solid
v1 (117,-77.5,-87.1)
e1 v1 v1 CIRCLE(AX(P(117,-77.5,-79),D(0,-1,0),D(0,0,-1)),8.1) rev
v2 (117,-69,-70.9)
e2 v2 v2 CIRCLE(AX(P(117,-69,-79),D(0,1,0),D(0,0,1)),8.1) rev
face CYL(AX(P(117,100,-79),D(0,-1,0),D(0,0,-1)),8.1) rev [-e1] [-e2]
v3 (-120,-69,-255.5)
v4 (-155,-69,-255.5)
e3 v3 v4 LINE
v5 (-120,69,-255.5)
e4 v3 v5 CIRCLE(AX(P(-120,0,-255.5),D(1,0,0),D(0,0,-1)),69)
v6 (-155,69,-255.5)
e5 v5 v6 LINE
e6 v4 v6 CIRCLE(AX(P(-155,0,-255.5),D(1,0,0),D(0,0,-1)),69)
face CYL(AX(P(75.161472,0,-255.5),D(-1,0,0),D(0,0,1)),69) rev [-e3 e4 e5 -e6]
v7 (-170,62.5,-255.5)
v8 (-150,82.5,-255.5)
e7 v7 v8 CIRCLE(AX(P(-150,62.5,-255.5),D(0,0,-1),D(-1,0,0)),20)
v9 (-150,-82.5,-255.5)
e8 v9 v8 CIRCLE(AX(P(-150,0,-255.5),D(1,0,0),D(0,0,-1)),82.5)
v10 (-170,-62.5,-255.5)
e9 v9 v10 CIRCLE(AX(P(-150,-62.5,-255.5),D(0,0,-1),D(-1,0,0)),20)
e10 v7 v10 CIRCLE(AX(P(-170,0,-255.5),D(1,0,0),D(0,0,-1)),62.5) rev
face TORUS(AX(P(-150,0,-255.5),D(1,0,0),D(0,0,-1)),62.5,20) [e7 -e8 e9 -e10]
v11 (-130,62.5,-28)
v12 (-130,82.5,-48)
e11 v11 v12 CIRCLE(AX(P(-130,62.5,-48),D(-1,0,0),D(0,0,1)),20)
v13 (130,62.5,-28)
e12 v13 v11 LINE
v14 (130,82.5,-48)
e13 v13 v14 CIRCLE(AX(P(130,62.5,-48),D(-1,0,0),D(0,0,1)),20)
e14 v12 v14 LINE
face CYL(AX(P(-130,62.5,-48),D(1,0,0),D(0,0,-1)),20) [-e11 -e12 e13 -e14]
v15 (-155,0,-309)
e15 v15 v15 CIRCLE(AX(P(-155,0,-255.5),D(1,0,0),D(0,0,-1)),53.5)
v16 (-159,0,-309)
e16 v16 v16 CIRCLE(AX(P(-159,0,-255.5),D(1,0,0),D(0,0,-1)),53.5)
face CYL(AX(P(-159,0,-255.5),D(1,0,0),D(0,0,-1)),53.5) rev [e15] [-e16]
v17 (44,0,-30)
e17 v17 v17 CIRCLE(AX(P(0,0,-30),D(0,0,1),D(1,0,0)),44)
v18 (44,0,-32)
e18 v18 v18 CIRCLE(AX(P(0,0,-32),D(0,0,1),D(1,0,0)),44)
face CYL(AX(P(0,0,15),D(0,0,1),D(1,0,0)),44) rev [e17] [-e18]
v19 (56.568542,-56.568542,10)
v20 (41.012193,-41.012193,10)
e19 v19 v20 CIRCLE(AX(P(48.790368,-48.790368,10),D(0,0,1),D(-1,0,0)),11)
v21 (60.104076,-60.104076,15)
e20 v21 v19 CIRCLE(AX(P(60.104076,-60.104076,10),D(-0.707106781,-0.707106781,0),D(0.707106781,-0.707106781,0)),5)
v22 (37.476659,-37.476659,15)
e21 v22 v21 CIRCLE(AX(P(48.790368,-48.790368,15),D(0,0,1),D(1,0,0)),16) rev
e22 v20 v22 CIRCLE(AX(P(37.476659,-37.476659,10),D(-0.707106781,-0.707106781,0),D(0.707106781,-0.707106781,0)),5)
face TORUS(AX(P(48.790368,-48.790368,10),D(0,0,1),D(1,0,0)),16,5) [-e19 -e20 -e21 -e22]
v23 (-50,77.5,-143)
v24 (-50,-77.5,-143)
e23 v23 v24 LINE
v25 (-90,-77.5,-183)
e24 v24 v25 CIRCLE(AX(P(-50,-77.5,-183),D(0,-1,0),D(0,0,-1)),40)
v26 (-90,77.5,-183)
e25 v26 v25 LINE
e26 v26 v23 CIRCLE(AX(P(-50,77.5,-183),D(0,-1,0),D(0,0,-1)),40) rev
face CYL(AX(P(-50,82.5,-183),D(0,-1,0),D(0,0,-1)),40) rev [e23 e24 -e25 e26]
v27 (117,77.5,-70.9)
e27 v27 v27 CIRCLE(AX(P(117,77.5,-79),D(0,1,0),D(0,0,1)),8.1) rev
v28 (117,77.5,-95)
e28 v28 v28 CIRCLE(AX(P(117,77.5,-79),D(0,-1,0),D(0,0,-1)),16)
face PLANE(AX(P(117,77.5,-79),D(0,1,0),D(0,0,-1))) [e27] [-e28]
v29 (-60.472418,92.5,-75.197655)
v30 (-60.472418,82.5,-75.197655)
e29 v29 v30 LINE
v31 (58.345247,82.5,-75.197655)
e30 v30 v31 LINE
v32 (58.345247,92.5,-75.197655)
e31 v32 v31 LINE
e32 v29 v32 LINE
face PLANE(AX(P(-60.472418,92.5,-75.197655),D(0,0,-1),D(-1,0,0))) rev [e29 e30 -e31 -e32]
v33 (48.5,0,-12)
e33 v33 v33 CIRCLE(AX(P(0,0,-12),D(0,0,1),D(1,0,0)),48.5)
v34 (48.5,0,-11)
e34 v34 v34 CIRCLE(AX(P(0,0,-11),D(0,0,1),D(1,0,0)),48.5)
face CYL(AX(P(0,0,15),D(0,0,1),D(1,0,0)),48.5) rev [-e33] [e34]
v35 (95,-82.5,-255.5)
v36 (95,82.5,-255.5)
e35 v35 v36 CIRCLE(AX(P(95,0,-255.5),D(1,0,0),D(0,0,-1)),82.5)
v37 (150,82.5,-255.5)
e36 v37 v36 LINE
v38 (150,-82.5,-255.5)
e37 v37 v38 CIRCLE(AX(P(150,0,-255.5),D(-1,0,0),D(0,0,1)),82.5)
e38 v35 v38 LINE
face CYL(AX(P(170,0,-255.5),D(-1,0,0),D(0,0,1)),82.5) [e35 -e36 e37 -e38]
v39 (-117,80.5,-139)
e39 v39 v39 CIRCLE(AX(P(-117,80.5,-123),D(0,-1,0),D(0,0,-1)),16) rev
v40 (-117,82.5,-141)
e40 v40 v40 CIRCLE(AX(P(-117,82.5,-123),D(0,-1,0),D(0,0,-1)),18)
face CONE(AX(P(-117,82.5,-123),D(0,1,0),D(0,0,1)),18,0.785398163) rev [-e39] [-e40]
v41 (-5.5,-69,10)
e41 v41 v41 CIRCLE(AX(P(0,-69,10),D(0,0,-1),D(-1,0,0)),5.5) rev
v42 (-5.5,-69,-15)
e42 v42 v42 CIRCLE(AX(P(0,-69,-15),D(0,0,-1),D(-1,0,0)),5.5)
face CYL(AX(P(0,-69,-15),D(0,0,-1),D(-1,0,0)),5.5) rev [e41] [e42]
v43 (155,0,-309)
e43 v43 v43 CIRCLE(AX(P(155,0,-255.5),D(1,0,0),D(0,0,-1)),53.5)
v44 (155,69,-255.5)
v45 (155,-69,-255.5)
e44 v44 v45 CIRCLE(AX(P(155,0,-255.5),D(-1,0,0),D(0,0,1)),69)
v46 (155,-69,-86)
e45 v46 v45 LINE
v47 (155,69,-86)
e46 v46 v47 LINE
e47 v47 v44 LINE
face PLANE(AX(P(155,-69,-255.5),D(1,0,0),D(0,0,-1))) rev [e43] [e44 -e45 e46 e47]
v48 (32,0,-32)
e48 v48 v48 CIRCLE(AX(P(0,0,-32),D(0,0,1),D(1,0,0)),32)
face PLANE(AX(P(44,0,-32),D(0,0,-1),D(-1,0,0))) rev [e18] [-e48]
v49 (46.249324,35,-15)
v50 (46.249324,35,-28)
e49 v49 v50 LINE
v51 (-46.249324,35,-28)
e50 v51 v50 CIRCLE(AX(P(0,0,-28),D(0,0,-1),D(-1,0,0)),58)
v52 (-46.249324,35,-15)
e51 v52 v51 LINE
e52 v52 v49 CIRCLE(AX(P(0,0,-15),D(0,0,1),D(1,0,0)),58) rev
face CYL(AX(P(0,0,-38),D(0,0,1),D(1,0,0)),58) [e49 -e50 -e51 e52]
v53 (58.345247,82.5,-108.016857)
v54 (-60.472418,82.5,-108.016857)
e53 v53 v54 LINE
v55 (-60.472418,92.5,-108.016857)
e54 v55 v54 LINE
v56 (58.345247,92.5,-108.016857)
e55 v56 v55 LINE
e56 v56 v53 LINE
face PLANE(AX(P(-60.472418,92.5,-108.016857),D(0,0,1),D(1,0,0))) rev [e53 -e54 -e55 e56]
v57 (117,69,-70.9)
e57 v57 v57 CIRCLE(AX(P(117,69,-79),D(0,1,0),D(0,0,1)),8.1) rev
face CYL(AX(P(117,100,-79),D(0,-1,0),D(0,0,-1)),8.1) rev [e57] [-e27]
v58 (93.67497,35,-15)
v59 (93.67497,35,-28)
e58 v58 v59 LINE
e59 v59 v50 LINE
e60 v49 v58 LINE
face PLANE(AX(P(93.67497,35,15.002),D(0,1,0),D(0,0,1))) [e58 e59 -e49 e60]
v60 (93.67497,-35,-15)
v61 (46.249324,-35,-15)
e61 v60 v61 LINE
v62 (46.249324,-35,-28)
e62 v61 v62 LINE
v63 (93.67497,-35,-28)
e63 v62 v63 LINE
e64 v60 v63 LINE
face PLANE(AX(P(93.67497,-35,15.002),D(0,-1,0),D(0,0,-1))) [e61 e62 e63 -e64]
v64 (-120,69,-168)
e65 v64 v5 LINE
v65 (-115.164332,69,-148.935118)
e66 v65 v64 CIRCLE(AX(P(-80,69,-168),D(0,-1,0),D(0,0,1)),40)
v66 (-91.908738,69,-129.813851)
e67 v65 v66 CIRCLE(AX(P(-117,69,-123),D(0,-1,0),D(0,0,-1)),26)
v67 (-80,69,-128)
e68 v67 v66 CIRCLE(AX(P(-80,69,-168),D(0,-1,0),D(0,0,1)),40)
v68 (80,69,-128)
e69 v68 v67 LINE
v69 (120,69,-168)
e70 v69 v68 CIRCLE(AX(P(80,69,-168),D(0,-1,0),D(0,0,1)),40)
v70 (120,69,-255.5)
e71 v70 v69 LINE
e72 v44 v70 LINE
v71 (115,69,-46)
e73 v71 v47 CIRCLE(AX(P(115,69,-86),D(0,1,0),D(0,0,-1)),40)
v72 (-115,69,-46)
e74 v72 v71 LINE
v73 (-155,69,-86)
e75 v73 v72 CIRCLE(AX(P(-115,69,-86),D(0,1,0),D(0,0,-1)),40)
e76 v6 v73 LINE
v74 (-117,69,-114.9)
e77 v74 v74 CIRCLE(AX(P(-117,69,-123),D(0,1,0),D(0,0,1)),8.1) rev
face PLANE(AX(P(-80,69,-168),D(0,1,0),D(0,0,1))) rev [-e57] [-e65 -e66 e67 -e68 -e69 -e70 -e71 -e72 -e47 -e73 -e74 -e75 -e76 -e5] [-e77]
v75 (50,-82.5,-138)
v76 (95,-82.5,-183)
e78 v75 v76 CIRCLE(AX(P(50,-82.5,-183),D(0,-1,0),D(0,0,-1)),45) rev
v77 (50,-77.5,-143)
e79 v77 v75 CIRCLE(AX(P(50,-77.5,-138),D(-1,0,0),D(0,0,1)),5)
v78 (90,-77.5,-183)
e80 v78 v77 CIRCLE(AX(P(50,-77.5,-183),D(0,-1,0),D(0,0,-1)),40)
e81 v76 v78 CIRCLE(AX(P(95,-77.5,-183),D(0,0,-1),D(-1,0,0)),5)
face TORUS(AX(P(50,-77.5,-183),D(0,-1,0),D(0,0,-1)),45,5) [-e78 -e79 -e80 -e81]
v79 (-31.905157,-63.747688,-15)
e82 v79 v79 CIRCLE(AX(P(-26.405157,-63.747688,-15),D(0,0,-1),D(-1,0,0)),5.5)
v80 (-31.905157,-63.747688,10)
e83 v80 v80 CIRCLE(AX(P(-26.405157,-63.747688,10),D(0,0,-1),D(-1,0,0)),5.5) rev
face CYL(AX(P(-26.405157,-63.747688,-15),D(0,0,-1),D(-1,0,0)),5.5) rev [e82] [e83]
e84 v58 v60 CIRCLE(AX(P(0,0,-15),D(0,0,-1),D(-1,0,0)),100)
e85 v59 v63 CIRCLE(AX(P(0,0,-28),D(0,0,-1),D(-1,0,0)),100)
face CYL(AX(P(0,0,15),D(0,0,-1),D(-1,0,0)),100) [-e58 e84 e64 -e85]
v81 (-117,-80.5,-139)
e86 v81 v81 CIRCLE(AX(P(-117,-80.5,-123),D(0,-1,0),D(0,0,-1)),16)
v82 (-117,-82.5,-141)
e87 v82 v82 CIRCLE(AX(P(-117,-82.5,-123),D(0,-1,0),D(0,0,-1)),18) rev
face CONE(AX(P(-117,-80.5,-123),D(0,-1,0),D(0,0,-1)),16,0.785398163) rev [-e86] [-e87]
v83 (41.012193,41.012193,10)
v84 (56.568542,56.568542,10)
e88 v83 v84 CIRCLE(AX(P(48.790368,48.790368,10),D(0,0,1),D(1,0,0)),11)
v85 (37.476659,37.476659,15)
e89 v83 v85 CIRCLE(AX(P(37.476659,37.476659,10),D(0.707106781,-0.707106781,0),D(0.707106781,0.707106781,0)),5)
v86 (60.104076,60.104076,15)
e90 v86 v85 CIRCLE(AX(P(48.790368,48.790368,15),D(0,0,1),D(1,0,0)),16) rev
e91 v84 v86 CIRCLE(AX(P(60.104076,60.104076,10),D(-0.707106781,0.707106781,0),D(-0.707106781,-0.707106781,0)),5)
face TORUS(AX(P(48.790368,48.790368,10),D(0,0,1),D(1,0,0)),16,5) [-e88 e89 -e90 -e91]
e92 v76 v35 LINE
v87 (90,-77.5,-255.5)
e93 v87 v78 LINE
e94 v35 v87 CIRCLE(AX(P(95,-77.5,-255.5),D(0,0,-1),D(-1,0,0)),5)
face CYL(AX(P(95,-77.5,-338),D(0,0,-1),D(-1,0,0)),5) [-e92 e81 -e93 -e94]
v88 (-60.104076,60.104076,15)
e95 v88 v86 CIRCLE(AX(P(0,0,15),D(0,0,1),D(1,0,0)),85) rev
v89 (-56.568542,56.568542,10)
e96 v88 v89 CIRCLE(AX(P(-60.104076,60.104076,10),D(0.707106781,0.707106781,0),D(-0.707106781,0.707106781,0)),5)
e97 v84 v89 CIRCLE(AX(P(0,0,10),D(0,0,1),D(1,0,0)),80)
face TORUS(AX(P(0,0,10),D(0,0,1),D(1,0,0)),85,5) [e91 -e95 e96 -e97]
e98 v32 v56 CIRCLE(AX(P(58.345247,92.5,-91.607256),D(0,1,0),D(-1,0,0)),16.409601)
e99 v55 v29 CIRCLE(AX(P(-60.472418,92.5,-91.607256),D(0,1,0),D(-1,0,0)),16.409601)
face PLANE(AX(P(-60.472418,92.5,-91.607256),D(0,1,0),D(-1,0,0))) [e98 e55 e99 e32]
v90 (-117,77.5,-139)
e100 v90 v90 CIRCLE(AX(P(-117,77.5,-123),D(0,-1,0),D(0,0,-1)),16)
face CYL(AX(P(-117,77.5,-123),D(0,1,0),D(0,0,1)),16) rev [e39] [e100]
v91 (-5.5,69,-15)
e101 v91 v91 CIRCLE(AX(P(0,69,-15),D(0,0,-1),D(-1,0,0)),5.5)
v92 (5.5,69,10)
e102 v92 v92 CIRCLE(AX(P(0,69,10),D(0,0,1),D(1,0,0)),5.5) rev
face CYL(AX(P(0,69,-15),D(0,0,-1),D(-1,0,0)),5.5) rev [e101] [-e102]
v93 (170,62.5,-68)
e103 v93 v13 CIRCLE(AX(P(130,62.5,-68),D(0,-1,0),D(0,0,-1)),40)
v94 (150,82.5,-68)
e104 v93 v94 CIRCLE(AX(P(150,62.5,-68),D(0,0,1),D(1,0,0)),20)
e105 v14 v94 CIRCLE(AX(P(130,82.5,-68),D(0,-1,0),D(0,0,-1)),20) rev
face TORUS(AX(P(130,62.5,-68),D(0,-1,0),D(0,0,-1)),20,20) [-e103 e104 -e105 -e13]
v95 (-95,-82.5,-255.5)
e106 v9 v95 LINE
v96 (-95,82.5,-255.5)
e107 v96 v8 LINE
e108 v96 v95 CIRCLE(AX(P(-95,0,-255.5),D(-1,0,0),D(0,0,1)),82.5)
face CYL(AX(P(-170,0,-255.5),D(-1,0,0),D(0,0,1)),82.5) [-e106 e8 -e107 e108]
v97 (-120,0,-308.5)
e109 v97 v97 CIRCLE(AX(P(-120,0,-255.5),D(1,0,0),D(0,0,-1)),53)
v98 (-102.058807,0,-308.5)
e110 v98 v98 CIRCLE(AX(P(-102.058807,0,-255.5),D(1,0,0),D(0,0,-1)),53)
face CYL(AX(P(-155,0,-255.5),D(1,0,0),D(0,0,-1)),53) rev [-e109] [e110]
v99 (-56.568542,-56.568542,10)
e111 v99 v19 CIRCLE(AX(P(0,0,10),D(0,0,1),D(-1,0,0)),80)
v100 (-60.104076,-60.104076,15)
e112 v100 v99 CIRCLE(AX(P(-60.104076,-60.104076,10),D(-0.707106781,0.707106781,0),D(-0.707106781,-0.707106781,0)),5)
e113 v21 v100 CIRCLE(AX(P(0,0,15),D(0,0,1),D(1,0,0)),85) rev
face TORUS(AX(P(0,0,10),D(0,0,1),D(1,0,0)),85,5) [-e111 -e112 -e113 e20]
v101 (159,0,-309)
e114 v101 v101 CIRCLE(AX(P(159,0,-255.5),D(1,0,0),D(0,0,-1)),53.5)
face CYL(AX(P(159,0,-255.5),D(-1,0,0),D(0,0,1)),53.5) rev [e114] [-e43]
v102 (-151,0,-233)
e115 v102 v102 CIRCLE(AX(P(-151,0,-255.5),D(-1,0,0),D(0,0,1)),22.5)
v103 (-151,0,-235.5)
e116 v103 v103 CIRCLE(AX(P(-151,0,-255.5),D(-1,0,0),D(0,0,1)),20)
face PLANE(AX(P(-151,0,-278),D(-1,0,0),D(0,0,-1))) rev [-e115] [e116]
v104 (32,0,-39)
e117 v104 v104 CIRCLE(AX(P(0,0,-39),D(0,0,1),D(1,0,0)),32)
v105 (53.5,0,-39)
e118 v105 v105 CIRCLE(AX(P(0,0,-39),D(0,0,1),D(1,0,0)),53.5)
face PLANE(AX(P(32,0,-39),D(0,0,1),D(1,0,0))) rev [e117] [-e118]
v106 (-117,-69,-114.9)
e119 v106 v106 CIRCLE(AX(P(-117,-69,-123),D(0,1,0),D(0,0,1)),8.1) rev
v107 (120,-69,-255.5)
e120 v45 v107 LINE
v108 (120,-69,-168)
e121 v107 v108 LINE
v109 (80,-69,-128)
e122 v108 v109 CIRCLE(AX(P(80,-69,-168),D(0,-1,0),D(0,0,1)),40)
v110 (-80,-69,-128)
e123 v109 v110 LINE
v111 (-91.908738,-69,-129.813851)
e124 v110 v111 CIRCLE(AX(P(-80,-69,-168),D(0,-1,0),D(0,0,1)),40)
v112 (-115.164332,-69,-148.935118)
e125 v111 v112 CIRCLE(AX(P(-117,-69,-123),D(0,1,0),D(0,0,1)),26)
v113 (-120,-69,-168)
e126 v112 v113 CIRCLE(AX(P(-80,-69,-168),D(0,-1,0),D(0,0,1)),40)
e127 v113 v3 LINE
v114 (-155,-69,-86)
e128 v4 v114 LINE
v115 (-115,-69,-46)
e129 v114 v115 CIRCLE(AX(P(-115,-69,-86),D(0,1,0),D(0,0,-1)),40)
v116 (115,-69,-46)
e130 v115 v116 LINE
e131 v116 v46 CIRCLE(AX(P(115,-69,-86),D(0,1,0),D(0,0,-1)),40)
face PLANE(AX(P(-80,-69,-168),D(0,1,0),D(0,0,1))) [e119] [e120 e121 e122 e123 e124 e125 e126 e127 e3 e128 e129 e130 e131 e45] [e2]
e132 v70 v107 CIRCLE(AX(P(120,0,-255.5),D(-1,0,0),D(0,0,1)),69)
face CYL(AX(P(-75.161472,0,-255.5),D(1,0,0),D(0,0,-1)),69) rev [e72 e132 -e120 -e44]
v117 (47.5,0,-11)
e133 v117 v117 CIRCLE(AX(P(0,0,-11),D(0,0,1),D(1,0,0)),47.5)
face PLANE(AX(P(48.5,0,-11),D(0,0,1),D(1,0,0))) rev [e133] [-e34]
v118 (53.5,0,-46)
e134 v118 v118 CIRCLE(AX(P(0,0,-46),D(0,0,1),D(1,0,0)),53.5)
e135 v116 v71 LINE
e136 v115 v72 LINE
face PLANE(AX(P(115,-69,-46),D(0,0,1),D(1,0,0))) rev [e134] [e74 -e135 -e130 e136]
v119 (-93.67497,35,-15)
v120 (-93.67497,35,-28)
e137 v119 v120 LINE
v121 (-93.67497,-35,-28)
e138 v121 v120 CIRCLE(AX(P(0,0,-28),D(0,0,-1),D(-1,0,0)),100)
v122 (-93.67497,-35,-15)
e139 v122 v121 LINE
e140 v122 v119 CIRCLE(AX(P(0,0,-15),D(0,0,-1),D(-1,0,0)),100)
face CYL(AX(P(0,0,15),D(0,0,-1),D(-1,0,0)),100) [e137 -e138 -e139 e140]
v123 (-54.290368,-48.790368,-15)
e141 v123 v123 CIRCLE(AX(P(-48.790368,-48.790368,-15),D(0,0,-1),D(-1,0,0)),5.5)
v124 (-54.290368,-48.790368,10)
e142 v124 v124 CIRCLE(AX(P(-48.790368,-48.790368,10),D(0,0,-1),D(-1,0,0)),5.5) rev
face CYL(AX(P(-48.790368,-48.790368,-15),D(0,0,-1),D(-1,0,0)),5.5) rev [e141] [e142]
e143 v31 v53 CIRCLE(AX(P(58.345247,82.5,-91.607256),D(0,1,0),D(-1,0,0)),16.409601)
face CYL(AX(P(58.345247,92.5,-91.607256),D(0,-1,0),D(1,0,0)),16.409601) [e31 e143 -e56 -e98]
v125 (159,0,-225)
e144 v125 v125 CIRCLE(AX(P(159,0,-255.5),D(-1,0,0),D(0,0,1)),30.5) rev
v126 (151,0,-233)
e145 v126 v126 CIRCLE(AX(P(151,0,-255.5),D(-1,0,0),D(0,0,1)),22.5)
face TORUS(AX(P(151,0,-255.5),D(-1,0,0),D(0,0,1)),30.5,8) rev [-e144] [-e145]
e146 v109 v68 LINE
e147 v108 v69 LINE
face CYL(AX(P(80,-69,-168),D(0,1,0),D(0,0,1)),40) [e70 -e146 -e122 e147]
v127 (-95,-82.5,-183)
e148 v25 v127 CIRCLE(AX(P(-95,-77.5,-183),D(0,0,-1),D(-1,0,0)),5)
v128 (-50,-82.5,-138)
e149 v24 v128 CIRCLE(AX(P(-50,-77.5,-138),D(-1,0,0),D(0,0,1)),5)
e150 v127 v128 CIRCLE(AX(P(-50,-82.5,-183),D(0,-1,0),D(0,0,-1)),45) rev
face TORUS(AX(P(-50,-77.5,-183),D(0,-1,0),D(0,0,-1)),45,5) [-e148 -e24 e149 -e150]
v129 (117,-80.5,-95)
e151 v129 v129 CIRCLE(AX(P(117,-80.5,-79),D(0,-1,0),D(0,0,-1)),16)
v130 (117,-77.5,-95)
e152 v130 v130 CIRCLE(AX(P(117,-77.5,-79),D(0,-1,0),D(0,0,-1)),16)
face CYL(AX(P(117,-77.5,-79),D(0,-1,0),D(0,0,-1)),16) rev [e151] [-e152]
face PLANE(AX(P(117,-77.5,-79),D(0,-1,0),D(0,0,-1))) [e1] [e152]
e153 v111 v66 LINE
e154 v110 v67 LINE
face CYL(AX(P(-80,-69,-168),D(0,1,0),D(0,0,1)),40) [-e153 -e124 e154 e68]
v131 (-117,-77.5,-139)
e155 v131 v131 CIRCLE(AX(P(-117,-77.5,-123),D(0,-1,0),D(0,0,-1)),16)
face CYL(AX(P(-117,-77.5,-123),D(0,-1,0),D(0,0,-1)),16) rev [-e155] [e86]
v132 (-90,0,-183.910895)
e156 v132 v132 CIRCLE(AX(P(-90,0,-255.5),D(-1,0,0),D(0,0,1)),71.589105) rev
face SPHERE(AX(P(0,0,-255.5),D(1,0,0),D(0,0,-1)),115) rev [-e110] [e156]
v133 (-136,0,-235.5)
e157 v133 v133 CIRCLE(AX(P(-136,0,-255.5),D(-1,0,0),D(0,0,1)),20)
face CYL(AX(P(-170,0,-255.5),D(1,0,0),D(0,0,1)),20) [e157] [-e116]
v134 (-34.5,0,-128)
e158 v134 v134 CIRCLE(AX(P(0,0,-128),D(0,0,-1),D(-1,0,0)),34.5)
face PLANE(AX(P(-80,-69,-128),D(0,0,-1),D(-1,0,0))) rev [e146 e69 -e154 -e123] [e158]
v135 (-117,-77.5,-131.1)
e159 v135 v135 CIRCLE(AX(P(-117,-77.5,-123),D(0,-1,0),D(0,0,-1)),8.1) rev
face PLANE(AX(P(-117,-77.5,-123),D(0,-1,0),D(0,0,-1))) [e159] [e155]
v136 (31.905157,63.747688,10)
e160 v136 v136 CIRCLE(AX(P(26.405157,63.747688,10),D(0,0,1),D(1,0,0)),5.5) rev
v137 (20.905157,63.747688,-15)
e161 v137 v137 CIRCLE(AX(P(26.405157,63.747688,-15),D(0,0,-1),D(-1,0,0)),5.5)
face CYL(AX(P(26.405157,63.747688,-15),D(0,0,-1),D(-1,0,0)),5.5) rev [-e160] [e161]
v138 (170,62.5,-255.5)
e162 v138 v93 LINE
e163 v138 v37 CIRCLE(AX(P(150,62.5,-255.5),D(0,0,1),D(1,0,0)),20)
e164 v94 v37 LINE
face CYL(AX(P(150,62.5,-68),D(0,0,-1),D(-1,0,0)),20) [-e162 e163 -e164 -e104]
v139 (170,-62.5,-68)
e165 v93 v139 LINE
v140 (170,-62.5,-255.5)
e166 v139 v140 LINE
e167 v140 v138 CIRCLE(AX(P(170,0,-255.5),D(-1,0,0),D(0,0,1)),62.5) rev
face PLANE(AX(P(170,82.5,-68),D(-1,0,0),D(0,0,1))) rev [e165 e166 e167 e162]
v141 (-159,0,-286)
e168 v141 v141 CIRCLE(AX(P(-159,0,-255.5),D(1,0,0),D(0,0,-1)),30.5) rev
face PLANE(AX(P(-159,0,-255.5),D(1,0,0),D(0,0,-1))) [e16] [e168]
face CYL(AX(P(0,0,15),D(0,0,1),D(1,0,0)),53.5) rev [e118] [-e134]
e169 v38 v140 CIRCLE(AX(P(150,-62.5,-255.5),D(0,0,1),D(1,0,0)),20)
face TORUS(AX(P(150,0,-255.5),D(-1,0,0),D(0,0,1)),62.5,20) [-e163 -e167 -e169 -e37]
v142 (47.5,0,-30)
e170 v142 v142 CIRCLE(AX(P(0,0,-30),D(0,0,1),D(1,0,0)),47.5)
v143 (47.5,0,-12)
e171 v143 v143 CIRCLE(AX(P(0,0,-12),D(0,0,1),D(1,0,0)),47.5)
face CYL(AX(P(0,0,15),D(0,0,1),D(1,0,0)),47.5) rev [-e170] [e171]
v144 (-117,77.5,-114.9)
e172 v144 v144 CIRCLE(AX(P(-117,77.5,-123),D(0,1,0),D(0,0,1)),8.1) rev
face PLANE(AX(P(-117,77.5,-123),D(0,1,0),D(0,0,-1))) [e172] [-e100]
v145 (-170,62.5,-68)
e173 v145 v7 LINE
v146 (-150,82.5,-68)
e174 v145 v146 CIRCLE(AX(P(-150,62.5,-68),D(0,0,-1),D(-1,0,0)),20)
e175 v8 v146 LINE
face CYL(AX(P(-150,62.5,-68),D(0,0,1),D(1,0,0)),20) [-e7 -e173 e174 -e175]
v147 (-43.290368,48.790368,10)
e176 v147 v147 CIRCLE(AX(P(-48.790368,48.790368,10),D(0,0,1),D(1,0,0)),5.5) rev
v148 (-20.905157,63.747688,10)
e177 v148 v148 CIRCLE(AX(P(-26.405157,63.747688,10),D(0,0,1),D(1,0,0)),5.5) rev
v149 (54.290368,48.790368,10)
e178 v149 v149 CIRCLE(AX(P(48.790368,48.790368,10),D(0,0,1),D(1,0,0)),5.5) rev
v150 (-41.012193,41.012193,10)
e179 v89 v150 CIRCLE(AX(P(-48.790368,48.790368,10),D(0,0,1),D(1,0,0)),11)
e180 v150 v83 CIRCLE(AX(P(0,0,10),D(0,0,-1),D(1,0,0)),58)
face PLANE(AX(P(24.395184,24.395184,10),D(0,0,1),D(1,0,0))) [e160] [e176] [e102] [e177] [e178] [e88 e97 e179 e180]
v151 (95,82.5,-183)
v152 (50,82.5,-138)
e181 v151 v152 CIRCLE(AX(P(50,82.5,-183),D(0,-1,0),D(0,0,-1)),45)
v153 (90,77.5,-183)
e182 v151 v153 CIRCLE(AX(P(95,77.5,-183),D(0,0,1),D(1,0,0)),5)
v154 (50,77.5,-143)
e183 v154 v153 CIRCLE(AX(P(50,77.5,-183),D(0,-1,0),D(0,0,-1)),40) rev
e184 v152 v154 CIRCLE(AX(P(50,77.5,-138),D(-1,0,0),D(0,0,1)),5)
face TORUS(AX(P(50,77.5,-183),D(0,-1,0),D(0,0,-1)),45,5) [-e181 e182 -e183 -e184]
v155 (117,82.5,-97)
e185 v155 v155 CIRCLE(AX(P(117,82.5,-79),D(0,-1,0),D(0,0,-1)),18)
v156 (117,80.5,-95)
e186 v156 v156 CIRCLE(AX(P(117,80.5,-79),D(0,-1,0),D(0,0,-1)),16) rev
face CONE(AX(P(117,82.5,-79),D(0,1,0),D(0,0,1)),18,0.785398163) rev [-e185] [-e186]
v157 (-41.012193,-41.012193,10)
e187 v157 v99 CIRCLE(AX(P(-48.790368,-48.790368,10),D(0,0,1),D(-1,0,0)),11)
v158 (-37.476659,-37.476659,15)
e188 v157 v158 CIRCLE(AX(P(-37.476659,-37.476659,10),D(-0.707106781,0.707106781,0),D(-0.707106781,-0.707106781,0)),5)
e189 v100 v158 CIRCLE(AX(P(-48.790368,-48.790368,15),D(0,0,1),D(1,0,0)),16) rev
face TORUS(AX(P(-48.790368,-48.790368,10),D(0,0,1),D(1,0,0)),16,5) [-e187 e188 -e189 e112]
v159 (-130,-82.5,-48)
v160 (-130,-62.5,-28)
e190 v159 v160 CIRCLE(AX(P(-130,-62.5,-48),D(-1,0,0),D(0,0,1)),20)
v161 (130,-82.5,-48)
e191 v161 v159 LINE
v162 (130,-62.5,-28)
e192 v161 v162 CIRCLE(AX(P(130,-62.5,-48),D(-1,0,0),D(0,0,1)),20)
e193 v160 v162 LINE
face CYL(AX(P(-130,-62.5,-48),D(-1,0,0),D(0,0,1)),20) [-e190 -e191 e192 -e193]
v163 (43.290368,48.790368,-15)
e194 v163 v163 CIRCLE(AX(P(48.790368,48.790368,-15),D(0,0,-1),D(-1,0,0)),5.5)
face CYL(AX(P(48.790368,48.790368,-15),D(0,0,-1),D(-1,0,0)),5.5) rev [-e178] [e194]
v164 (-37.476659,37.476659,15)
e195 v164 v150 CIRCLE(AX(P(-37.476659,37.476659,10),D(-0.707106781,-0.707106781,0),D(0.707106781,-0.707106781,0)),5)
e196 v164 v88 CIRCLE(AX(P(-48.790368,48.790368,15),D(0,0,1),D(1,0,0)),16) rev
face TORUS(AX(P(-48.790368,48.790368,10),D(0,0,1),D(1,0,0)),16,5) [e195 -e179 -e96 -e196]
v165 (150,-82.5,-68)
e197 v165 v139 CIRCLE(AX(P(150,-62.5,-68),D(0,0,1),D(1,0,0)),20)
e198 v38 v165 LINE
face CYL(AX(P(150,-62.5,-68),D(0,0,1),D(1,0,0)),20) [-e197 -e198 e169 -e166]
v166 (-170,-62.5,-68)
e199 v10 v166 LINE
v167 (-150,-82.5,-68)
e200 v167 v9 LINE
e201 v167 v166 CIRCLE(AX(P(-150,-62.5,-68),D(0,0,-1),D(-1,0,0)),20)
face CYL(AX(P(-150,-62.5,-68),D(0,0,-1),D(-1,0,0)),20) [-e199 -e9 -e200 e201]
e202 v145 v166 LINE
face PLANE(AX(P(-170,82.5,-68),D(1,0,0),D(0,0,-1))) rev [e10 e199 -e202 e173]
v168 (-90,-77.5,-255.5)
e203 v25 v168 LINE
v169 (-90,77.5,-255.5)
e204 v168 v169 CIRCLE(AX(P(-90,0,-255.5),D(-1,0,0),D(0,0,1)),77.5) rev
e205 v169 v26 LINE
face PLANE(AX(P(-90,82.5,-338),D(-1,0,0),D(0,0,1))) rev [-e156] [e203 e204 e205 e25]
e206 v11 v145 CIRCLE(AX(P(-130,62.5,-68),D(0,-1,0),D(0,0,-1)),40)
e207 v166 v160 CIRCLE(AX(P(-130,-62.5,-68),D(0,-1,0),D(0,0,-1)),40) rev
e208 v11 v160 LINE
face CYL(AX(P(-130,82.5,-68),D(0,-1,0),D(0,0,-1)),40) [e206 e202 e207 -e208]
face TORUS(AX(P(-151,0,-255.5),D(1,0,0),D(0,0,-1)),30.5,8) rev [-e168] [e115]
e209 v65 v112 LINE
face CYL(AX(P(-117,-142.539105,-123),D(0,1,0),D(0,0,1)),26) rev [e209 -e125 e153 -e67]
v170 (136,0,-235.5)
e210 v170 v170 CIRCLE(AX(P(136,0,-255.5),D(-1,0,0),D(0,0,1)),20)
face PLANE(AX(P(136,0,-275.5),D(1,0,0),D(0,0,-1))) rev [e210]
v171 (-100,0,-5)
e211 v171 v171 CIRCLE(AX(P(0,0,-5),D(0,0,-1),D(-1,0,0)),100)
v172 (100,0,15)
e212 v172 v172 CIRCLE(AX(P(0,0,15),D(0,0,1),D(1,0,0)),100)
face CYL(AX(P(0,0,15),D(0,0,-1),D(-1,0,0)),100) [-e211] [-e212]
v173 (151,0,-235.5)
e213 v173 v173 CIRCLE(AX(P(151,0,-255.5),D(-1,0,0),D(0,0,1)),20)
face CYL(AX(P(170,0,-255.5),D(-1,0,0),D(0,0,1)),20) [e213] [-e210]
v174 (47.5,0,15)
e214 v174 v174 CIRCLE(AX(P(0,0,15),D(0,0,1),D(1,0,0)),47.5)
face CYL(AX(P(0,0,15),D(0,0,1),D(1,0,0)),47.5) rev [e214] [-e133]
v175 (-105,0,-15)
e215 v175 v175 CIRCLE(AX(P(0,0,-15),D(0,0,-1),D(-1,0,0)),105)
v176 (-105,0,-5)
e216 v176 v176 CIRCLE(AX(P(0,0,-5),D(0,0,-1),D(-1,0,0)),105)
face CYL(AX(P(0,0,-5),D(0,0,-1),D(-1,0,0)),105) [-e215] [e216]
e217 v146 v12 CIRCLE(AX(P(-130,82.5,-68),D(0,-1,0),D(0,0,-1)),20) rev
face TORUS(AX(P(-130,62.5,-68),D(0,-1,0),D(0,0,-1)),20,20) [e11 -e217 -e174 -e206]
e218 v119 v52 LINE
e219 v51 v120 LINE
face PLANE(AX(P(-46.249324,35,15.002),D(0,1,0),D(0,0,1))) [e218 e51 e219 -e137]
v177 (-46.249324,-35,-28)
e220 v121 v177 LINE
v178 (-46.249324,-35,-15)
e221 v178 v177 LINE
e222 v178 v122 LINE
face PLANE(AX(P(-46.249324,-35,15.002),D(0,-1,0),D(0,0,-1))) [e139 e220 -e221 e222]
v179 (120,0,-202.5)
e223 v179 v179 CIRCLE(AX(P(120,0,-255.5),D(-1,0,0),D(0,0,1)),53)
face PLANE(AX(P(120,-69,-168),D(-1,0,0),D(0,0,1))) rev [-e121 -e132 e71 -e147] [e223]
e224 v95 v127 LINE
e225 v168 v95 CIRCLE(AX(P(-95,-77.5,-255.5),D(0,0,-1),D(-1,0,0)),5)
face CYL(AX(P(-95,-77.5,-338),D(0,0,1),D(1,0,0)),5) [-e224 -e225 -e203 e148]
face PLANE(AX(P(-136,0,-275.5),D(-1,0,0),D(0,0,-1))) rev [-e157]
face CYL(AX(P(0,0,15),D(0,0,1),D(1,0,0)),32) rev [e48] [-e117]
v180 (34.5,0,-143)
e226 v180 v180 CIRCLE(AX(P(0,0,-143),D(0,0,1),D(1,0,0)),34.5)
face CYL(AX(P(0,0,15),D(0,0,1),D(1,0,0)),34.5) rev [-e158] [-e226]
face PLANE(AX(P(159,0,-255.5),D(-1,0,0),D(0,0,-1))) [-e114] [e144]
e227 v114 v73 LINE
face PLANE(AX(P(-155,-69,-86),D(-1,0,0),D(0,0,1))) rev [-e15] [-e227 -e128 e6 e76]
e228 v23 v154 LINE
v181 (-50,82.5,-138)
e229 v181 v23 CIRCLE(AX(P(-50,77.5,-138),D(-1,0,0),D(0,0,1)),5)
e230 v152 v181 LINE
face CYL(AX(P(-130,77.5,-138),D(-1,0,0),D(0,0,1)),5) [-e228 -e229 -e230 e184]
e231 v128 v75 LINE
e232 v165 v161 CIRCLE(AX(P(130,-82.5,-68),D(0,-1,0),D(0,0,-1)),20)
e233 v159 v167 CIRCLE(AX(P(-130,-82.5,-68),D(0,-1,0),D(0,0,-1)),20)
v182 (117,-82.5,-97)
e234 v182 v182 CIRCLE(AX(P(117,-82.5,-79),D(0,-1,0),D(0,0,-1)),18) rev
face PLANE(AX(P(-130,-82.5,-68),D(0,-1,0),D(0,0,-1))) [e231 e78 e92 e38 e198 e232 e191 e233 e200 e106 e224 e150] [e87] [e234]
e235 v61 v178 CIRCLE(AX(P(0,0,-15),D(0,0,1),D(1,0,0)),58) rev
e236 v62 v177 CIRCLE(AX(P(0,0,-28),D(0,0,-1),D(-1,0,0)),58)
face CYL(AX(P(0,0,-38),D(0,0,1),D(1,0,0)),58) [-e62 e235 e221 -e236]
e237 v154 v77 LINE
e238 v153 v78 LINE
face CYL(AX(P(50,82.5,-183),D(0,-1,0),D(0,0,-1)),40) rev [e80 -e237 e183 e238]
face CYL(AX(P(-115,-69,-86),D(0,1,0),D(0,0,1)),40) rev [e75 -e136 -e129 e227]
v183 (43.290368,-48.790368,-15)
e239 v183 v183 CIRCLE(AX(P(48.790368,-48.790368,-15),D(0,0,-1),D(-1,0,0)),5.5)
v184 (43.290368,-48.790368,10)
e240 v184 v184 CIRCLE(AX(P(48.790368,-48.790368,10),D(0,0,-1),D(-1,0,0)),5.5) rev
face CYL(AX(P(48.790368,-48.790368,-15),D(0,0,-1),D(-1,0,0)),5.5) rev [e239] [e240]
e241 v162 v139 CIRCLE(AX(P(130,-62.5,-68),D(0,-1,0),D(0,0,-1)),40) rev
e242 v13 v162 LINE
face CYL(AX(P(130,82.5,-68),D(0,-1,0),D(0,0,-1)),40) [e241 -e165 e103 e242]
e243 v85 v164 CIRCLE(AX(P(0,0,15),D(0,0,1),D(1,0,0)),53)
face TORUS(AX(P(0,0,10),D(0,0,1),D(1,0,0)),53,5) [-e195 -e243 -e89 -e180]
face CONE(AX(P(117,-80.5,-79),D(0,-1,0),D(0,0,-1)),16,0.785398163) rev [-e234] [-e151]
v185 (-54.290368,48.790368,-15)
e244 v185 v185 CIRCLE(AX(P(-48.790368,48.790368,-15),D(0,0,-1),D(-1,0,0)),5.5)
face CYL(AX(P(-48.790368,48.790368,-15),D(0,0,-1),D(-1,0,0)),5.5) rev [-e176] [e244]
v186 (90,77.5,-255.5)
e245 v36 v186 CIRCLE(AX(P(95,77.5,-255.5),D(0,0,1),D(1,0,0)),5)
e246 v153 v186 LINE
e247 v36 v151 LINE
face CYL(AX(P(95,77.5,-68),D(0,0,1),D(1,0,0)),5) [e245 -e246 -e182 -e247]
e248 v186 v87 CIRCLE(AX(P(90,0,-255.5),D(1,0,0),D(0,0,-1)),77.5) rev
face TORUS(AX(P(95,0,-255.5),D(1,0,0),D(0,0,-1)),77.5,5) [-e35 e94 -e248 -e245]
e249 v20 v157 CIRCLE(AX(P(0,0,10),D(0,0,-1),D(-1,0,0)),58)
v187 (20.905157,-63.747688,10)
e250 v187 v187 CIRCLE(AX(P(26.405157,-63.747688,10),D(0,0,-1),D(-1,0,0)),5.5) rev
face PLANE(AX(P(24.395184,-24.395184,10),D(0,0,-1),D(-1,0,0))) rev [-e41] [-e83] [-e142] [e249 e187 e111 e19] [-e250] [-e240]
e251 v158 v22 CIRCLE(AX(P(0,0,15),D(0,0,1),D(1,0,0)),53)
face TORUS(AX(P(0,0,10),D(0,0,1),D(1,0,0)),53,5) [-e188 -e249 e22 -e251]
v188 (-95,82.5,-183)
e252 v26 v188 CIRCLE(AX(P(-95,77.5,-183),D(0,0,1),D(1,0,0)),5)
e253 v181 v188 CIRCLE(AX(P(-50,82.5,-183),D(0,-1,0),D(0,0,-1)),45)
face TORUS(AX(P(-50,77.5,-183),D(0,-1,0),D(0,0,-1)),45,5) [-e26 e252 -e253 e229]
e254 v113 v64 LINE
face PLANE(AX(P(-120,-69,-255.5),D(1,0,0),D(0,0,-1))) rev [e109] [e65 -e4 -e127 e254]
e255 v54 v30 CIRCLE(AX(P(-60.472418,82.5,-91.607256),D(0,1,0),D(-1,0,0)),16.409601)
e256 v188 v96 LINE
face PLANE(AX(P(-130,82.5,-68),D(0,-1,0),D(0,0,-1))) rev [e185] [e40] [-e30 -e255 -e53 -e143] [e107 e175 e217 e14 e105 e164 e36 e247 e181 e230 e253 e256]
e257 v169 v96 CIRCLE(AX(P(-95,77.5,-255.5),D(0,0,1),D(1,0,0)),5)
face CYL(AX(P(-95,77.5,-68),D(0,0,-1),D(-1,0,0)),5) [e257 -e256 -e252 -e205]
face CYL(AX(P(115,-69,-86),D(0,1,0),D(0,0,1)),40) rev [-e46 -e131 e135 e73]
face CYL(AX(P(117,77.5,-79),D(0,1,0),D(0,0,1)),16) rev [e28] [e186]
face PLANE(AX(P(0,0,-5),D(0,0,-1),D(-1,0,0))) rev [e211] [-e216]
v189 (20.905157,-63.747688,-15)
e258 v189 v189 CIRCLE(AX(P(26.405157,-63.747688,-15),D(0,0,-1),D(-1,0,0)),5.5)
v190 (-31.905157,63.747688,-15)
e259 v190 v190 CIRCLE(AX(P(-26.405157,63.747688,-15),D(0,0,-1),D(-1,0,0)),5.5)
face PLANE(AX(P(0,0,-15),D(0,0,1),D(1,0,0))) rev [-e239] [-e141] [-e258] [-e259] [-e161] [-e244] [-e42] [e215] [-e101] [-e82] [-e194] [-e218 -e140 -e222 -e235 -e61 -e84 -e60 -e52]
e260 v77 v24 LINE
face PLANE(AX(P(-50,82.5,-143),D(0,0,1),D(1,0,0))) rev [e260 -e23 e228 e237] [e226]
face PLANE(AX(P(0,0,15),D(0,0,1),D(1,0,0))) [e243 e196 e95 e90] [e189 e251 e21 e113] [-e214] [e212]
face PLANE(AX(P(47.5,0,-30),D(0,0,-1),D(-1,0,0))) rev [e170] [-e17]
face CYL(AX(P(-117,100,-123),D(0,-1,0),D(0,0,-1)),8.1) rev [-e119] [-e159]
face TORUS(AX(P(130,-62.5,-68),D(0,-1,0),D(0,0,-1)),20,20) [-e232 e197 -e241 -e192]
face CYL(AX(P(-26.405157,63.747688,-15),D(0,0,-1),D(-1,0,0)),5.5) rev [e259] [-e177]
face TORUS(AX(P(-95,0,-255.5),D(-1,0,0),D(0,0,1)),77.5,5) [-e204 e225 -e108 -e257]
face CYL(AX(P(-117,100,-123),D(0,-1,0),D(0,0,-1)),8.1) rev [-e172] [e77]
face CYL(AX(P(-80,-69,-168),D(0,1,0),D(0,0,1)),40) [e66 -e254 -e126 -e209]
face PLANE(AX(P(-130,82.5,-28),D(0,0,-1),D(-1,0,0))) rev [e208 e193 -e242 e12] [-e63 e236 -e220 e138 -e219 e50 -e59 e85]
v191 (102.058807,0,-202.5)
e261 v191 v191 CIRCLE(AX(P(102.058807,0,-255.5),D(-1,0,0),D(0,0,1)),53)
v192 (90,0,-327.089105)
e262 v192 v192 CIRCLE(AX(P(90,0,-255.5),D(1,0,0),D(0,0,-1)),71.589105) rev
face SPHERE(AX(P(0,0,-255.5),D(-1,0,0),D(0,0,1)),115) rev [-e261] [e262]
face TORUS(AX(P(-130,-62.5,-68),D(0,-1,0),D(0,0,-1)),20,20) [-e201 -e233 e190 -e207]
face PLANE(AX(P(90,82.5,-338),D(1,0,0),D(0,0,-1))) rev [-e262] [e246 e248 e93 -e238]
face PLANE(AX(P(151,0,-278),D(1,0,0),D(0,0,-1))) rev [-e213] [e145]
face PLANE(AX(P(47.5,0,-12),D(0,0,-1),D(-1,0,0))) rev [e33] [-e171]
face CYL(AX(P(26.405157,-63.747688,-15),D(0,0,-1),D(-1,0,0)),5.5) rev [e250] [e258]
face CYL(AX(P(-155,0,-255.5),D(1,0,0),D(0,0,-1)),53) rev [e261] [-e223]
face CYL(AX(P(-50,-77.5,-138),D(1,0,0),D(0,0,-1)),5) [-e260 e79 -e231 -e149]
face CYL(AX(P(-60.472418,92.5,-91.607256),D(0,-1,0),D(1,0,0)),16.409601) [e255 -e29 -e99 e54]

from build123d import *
from build123d.topology import SkipClean

# Parameters (mm, degrees)
SKETCH1_R                  = 100
EXTRUDE1_DEPTH             = 15
F_11_0_11_DIAMETER_HOLE3_D = 11
EXTRUDE2_DEPTH             = 5
FILLET1_R                  = 5
SKETCH12_R                 = 58
EXTRUDE6_DEPTH             = 23
EXTRUDE7_REACH             = 153.026
EXTRUDE12_DEPTH            = 82.5
FILLET2_RADIUS             = 82.5
FILLET2_LENGTH             = 80
FILLET3_RADIUS             = 82.5
FILLET3_LENGTH             = 80
EXTRUDE13_DEPTH            = 69
FILLET4_R                  = 20
SKETCH24_R                 = 53
EXTRUDE14_DEPTH            = 155
SKETCH27_R                 = 69
EXTRUDE16_DEPTH            = 35
EXTRUDE17_START            = 35
SKETCH28_R                 = 69
EXTRUDE17_DEPTH            = 35
SKETCH30_R                 = 53.5
EXTRUDE18_DEPTH            = 4
FILLET5_R                  = 8
SKETCH34_R                 = 26
EXTRUDE19_DEPTH            = 138
SKETCH35_R                 = 16
EXTRUDE21_DEPTH            = 5
CHAMFER2_SIZE              = 2
EXTRUDE22_DEPTH            = 392.336173
EXTRUDE22_DEPTH_BACK       = 392.336173
SKETCH36_R                 = 8.1
FILLET6_R                  = 5
SKETCH37_R                 = 105
SKETCH37_R_2               = 100
EXTRUDE23_DEPTH            = 10
BOSS_EXTRUDE1_DEPTH        = 10


with BuildPart() as part:
    # Sketch1 → Extrude1 (new, symmetric)
    with BuildSketch(Plane.XY):
        Circle(SKETCH1_R)
    extrude(amount=EXTRUDE1_DEPTH, both=True)

    # Ø11.0 (11) Diameter Hole3 (through all)
    with Locations(Plane(origin=(0, 0, -15), x_dir=(-1, 0, 0), z_dir=(0, 0, -1))):
        with Locations((-48.790368, 48.790368), (-26.405157, 63.747688), (0, 69), (26.405157, 63.747688), (48.790368, 48.790368), (48.790368, -48.790368), (26.405157, -63.747688), (0, -69), (-26.405157, -63.747688), (-48.790368, -48.790368)):
            Hole(F_11_0_11_DIAMETER_HOLE3_D / 2)

    # Sketch2 → Extrude2 (cut)
    with BuildSketch(Plane.XY.offset(15)):
        with BuildLine():
            ThreePointArc((56.568542, 56.568542), (0, 80), (-56.568542, 56.568542))
            ThreePointArc((-56.568542, 56.568542), (-56.568542, 41.012193), (-41.012193, 41.012193))
            ThreePointArc((-41.012193, 41.012193), (0, 58), (41.012193, 41.012193))
            ThreePointArc((41.012193, 41.012193), (56.568542, 41.012193), (56.568542, 56.568542))
        make_face()
        with BuildLine():
            ThreePointArc((56.568542, -56.568542), (0, -80), (-56.568542, -56.568542))
            ThreePointArc((-56.568542, -56.568542), (-56.568542, -41.012193), (-41.012193, -41.012193))
            ThreePointArc((-41.012193, -41.012193), (0, -58), (41.012193, -41.012193))
            ThreePointArc((41.012193, -41.012193), (56.568542, -41.012193), (56.568542, -56.568542))
        make_face()
    extrude(amount=-EXTRUDE2_DEPTH, mode=Mode.SUBTRACT)

    # Fillet1
    fillet1_edges = [part.edges().sort_by_distance(p)[0] for p in [
        (-56.568542, -41.012193, 15),
        (0, -80, 15),
        (56.568542, -41.012193, 15),
        (0, -58, 15),
        (0, 80, 15),
        (-56.568542, 41.012193, 15),
        (56.568542, 41.012193, 15),
        (0, 58, 15),
    ]]
    fillet(fillet1_edges, radius=FILLET1_R - 0.0001)  # a hair under: the kernel refuses the full size

    # Sketch12 → Extrude6 (add)
    with BuildSketch(Plane(origin=(0, 0, -15), x_dir=(-1, 0, 0), z_dir=(0, 0, -1))):
        with Locations(Location((0, 0, 0), (0, 0, 180))):
            Circle(SKETCH12_R)
    extrude(amount=EXTRUDE6_DEPTH)

    # Sketch15 → Cut-Revolve1 (revolve, cut)
    with BuildSketch(Plane(origin=(0, 0, 0), x_dir=(1, 0, 0), z_dir=(0, 1, 0))):
        Polygon((0, 38), (32, 38), (32, 32), (44, 32), (44, 30), (47.5, 30), (47.5, 12), (48.5, 12), (48.5, 11), (47.5, 11), (47.5, -15), (0, -15), align=None)
    revolve(axis=Axis((0, 0, 15), (0, 0, -1)), mode=Mode.SUBTRACT)

    # Sketch16 → Extrude7 (add, up to next)
    with BuildSketch(Plane(origin=(0, 0, -38), x_dir=(-1, 0, 0), z_dir=(0, 0, -1)), mode=Mode.PRIVATE) as extrude7_sk1:
        with BuildLine():
            Line((-93.67497, 35), (-46.249324, 35))
            ThreePointArc((-46.249324, 35), (-58, 0), (-46.249324, -35))
            Line((-46.249324, -35), (-93.67497, -35))
            ThreePointArc((-93.67497, -35), (-100, 0), (-93.67497, 35))
        make_face()
    extrude7_tool1 = extrude(extrude7_sk1.sketch, amount=-EXTRUDE7_REACH, mode=Mode.PRIVATE) - part.part
    # Sketch16 → Extrude7 (add, up to next)
    with BuildSketch(Plane(origin=(0, 0, -38), x_dir=(-1, 0, 0), z_dir=(0, 0, -1)), mode=Mode.PRIVATE) as extrude7_sk2:
        with BuildLine():
            Line((46.249324, 35), (93.67497, 35))
            ThreePointArc((93.67497, 35), (100, 0), (93.67497, -35))
            Line((93.67497, -35), (46.249324, -35))
            ThreePointArc((46.249324, -35), (58, 0), (46.249324, 35))
        make_face()
    extrude7_tool2 = extrude(extrude7_sk2.sketch, amount=-EXTRUDE7_REACH, mode=Mode.PRIVATE) - part.part
    add(extrude7_tool1.solids().sort_by_distance((75.992672, 0, -38))[0])
    add(extrude7_tool2.solids().sort_by_distance((-75.992672, 0, -38))[0])

    # Sketch20 → Extrude12 (add, symmetric)
    with BuildSketch(Plane(origin=(0, 0, 0), x_dir=(1, 0, 0), z_dir=(0, 1, 0))):
        with BuildLine():
            Line((-50, 143), (50, 143))
            ThreePointArc((50, 143), (78.284271, 154.715729), (90, 183))
            Line((90, 183), (90, 338))
            Line((90, 338), (170, 338))
            Line((170, 338), (170, 68))
            ThreePointArc((170, 68), (158.284271, 39.715729), (130, 28))
            Line((130, 28), (-130, 28))
            ThreePointArc((-130, 28), (-158.284271, 39.715729), (-170, 68))
            Line((-170, 68), (-170, 338))
            Line((-170, 338), (-90, 338))
            Line((-90, 338), (-90, 183))
            ThreePointArc((-90, 183), (-78.284271, 154.715729), (-50, 143))
        make_face()
    extrude(amount=EXTRUDE12_DEPTH, both=True)

    # Fillet2: full round fillet: the end face becomes a half cylinder, R = half its width
    fillet2_face = Plane((130, 0, -338), x_dir=(-1, 0, 0), z_dir=(0, 0, -1))  # on the end face: x along it, z out of the body
    fillet2_slab = fillet2_face.offset(-FILLET2_RADIUS / 2) * Box(FILLET2_LENGTH, 2 * FILLET2_RADIUS, FILLET2_RADIUS, mode=Mode.PRIVATE)  # the body's end, R deep
    fillet2_round = Plane((130, 0, -255.5), x_dir=(0, 0, -1), z_dir=(-1, 0, 0)) * Cylinder(FILLET2_RADIUS, FILLET2_LENGTH, mode=Mode.PRIVATE)  # its axis R under the face
    add(fillet2_slab - fillet2_round, mode=Mode.SUBTRACT)

    # Fillet3: full round fillet: the end face becomes a half cylinder, R = half its width
    fillet3_face = Plane((-130, 0, -338), x_dir=(-1, 0, 0), z_dir=(0, 0, -1))  # on the end face: x along it, z out of the body
    fillet3_slab = fillet3_face.offset(-FILLET3_RADIUS / 2) * Box(FILLET3_LENGTH, 2 * FILLET3_RADIUS, FILLET3_RADIUS, mode=Mode.PRIVATE)  # the body's end, R deep
    fillet3_round = Plane((-130, 0, -255.5), x_dir=(0, 0, -1), z_dir=(-1, 0, 0)) * Cylinder(FILLET3_RADIUS, FILLET3_LENGTH, mode=Mode.PRIVATE)  # its axis R under the face
    add(fillet3_slab - fillet3_round, mode=Mode.SUBTRACT)

    # Sketch21 → Cut-Revolve2 (revolve, cut)
    with BuildSketch(Plane(origin=(0, 0, 0), x_dir=(1, 0, 0), z_dir=(0, 1, 0)), mode=Mode.PRIVATE) as cut_revolve2_sk:
        with BuildLine():
            Line((0, 370.5), (0, 153))
            Line((0, 153), (52.141634, 153))
            ThreePointArc((52.141634, 153), (111.831346, 282.309513), (0, 370.5))
        make_face()
    revolve(cut_revolve2_sk.sketch.rotate(Axis((0, 0, -370.5), (0, 0, 1)), 159.512685), axis=Axis((0, 0, -370.5), (0, 0, 1)), mode=Mode.SUBTRACT)

    # Sketch23 → Extrude13 (cut, symmetric)
    with BuildSketch(Plane(origin=(0, 0, 0), x_dir=(1, 0, 0), z_dir=(0, 1, 0))):
        with BuildLine():
            Line((-155, 255.5), (-120, 255.5))
            Line((-120, 255.5), (-120, 168))
            ThreePointArc((-120, 168), (-108.284271, 139.715729), (-80, 128))
            Line((-80, 128), (80, 128))
            ThreePointArc((80, 128), (108.284271, 139.715729), (120, 168))
            Line((120, 168), (120, 255.5))
            Line((120, 255.5), (155, 255.5))
            Line((155, 255.5), (155, 86))
            ThreePointArc((155, 86), (143.284271, 57.715729), (115, 46))
            Line((115, 46), (-115, 46))
            ThreePointArc((-115, 46), (-143.284271, 57.715729), (-155, 86))
            Line((-155, 86), (-155, 255.5))
        make_face()
    extrude(amount=EXTRUDE13_DEPTH, both=True, mode=Mode.SUBTRACT)

    # Fillet4
    fillet4_edges = [part.edges().sort_by_distance(p)[0] for p in [
        (-158.284271, -82.5, -39.715729),
        (0, -82.5, -28),
        (158.284271, -82.5, -39.715729),
        (170, -82.5, -161.75),
        (-158.284271, 82.5, -39.715729),
        (0, 82.5, -28),
        (158.284271, 82.5, -39.715729),
        (170, 82.5, -161.75),
        (170, -58.336309, -313.836309),
        (-170, -82.5, -161.75),
        (-170, 82.5, -161.75),
        (-170, -58.336309, -313.836309),
    ]]
    fillet(fillet4_edges, radius=FILLET4_R)

    # Sketch24 → Extrude14 (cut, symmetric)
    with SkipClean():  # the faces are left unmerged after this step: merging them gives an invalid solid
        with BuildSketch(Plane(origin=(0, 0, 0), x_dir=(0, 0, -1), z_dir=(1, 0, 0))):
            with Locations(Location((255.5, 0, 0), (0, 0, 90))):
                Circle(SKETCH24_R)
        extrude(amount=EXTRUDE14_DEPTH, both=True, mode=Mode.SUBTRACT)

    # Sketch27 → Extrude16 (cut)
    with SkipClean():  # the faces are left unmerged after this step: merging them gives an invalid solid
        with BuildSketch(Plane(origin=(-155, 0, 0), x_dir=(0, 0, -1), z_dir=(1, 0, 0))):
            with Locations((255.5, 0)):
                Circle(SKETCH27_R)
        extrude(amount=EXTRUDE16_DEPTH, mode=Mode.SUBTRACT)

    # Sketch28 → Extrude17 (cut)
    with SkipClean():  # the faces are left unmerged after this step: merging them gives an invalid solid
        with BuildSketch(Plane.ZY.offset(-155).offset(EXTRUDE17_START)):
            with Locations((-255.5, 0)):
                Circle(SKETCH28_R)
        extrude(amount=-EXTRUDE17_DEPTH, mode=Mode.SUBTRACT)

    # Sketch29 → Cut-Revolve3 (revolve, cut)
    with SkipClean():  # the faces are left unmerged after this step: merging them gives an invalid solid
        with BuildSketch(Plane(origin=(0, 0, 0), x_dir=(1, 0, 0), z_dir=(0, 1, 0))):
            Polygon((0, 28), (47.5, 28), (47.5, 30), (44, 30), (44, 32), (32, 32), (32, 39), (53.5, 39), (53.5, 127), (34.5, 127), (34.5, 143), (0, 143), align=None)
        revolve(axis=Axis((0, 0, 15), (0, 0, -1)), mode=Mode.SUBTRACT)

    # Sketch30 → Extrude18 (cut)
    with SkipClean():  # the faces are left unmerged after this step: merging them gives an invalid solid
        with BuildSketch(Plane(origin=(-155, 0, 0), x_dir=(0, 0, -1), z_dir=(1, 0, 0))):
            with Locations((255.5, 0)):
                Circle(SKETCH30_R)
        extrude18 = extrude(amount=-EXTRUDE18_DEPTH, mode=Mode.SUBTRACT)

    # Mirror1: Extrude18 across plane
    with SkipClean():  # the faces are left unmerged after this step: merging them gives an invalid solid
        add(extrude18.mirror(Plane(origin=(0, 0, 0), x_dir=(0, 0, 1), z_dir=(1, 0, 0))), mode=Mode.SUBTRACT)

    # Sketch33 → Revolve1 (revolve)
    with SkipClean():  # the faces are left unmerged after this step: merging them gives an invalid solid
        with BuildSketch(Plane(origin=(0, 0, 0), x_dir=(1, 0, 0), z_dir=(0, 1, 0)), mode=Mode.PRIVATE) as revolve1_sk:
            Polygon((159, 255.5), (159, 278), (151, 278), (151, 275.5), (136, 275.5), (136, 255.5), align=None)
        revolve1 = revolve(revolve1_sk.sketch.rotate(Axis((170, 0, -255.5), (1, 0, 0)), 180), axis=Axis((170, 0, -255.5), (1, 0, 0)))

    # Mirror2: Revolve1 across plane
    with SkipClean():  # the faces are left unmerged after this step: merging them gives an invalid solid
        add(revolve1.mirror(Plane(origin=(0, 0, 0), x_dir=(0, 0, 1), z_dir=(1, 0, 0))))

    # Fillet5
    fillet5_edges = [part.edges().sort_by_distance(p)[0] for p in [
        (159, 0, -278),
        (-159, 0, -278),
    ]]
    fillet(fillet5_edges, radius=FILLET5_R - 0.0001)  # a hair under: the kernel refuses the full size

    # Sketch34 → Extrude19 (cut)
    with SkipClean():  # the faces are left unmerged after this step: merging them gives an invalid solid
        with BuildSketch(Plane.XZ.offset(-69)):
            with Locations((-117, -123)):
                Circle(SKETCH34_R)
        extrude(amount=EXTRUDE19_DEPTH, mode=Mode.SUBTRACT)

    # Sketch35 → Extrude21 (cut)
    with SkipClean():  # the faces are left unmerged after this step: merging them gives an invalid solid
        with BuildSketch(Plane.XZ.offset(82.5)):
            with Locations(Location((-117, -123, 0), (0, 0, 270))):
                Circle(SKETCH35_R)
            with Locations(Location((117, -79, 0), (0, 0, 270))):
                Circle(SKETCH35_R)
        extrude21 = extrude(amount=-EXTRUDE21_DEPTH, mode=Mode.SUBTRACT)

    # Mirror5: Extrude21 across plane
    with SkipClean():  # the faces are left unmerged after this step: merging them gives an invalid solid
        add(extrude21.mirror(Plane.ZX), mode=Mode.SUBTRACT)

    # Chamfer2
    chamfer2_edges = [part.edges().sort_by_distance(p)[0] for p in [
        (-117, -82.5, -107),
        (117, -82.5, -63),
        (-117, 82.5, -107),
        (117, 82.5, -63),
    ]]
    chamfer(chamfer2_edges, length=CHAMFER2_SIZE)

    # Sketch36 → Extrude22 (cut, two sides: drawn at the far end of the back side and taken through both)
    with SkipClean():  # the faces are left unmerged after this step: merging them gives an invalid solid
        with BuildSketch(Plane(origin=(0, 0, 0), x_dir=(1, 0, 0), z_dir=(0, 1, 0)).offset(-EXTRUDE22_DEPTH_BACK)):
            with Locations(Location((-117, 123, 0), (0, 0, 270))):
                Circle(SKETCH36_R)
            with Locations(Location((117, 79, 0), (0, 0, 270))):
                Circle(SKETCH36_R)
        extrude(amount=EXTRUDE22_DEPTH + EXTRUDE22_DEPTH_BACK, mode=Mode.SUBTRACT)

    # Fillet6
    fillet6_edges = [part.edges().sort_by_distance(p)[0] for p in [
        (78.284271, -82.5, -154.715729),
        (0, -82.5, -143),
        (-78.284271, -82.5, -154.715729),
        (-90, -82.5, -219.25),
        (78.284271, 82.5, -154.715729),
        (0, 82.5, -143),
        (-78.284271, 82.5, -154.715729),
        (-90, 82.5, -219.25),
        (90, 82.5, -219.25),
        (90, -82.5, -219.25),
        (90, -58.336309, -313.836309),
        (-90, -58.336309, -313.836309),
    ]]
    fillet(fillet6_edges, radius=FILLET6_R)

    # Sketch37 → Extrude23 (add)
    with SkipClean():  # the faces are left unmerged after this step: merging them gives an invalid solid
        with BuildSketch(Plane(origin=(0, 0, -15), x_dir=(-1, 0, 0), z_dir=(0, 0, -1))):
            Circle(SKETCH37_R)
            Circle(SKETCH37_R_2, mode=Mode.SUBTRACT)
        extrude(amount=-EXTRUDE23_DEPTH)

    # Sketch39 → Boss-Extrude1 (add)
    with SkipClean():  # the faces are left unmerged after this step: merging them gives an invalid solid
        with BuildSketch(Plane(origin=(0, 82.5, 0), x_dir=(1, 0, 0), z_dir=(0, 1, 0))):
            with BuildLine():
                Line((-60.472418, 108.016857), (58.345247, 108.016857))
                ThreePointArc((58.345247, 108.016857), (74.754848, 91.607256), (58.345247, 75.197655))
                Line((58.345247, 75.197655), (-60.472418, 75.197655))
                ThreePointArc((-60.472418, 75.197655), (-76.882019, 91.607256), (-60.472418, 108.016857))
            make_face()
        extrude(amount=BOSS_EXTRUDE1_DEPTH)


solid = part.part
